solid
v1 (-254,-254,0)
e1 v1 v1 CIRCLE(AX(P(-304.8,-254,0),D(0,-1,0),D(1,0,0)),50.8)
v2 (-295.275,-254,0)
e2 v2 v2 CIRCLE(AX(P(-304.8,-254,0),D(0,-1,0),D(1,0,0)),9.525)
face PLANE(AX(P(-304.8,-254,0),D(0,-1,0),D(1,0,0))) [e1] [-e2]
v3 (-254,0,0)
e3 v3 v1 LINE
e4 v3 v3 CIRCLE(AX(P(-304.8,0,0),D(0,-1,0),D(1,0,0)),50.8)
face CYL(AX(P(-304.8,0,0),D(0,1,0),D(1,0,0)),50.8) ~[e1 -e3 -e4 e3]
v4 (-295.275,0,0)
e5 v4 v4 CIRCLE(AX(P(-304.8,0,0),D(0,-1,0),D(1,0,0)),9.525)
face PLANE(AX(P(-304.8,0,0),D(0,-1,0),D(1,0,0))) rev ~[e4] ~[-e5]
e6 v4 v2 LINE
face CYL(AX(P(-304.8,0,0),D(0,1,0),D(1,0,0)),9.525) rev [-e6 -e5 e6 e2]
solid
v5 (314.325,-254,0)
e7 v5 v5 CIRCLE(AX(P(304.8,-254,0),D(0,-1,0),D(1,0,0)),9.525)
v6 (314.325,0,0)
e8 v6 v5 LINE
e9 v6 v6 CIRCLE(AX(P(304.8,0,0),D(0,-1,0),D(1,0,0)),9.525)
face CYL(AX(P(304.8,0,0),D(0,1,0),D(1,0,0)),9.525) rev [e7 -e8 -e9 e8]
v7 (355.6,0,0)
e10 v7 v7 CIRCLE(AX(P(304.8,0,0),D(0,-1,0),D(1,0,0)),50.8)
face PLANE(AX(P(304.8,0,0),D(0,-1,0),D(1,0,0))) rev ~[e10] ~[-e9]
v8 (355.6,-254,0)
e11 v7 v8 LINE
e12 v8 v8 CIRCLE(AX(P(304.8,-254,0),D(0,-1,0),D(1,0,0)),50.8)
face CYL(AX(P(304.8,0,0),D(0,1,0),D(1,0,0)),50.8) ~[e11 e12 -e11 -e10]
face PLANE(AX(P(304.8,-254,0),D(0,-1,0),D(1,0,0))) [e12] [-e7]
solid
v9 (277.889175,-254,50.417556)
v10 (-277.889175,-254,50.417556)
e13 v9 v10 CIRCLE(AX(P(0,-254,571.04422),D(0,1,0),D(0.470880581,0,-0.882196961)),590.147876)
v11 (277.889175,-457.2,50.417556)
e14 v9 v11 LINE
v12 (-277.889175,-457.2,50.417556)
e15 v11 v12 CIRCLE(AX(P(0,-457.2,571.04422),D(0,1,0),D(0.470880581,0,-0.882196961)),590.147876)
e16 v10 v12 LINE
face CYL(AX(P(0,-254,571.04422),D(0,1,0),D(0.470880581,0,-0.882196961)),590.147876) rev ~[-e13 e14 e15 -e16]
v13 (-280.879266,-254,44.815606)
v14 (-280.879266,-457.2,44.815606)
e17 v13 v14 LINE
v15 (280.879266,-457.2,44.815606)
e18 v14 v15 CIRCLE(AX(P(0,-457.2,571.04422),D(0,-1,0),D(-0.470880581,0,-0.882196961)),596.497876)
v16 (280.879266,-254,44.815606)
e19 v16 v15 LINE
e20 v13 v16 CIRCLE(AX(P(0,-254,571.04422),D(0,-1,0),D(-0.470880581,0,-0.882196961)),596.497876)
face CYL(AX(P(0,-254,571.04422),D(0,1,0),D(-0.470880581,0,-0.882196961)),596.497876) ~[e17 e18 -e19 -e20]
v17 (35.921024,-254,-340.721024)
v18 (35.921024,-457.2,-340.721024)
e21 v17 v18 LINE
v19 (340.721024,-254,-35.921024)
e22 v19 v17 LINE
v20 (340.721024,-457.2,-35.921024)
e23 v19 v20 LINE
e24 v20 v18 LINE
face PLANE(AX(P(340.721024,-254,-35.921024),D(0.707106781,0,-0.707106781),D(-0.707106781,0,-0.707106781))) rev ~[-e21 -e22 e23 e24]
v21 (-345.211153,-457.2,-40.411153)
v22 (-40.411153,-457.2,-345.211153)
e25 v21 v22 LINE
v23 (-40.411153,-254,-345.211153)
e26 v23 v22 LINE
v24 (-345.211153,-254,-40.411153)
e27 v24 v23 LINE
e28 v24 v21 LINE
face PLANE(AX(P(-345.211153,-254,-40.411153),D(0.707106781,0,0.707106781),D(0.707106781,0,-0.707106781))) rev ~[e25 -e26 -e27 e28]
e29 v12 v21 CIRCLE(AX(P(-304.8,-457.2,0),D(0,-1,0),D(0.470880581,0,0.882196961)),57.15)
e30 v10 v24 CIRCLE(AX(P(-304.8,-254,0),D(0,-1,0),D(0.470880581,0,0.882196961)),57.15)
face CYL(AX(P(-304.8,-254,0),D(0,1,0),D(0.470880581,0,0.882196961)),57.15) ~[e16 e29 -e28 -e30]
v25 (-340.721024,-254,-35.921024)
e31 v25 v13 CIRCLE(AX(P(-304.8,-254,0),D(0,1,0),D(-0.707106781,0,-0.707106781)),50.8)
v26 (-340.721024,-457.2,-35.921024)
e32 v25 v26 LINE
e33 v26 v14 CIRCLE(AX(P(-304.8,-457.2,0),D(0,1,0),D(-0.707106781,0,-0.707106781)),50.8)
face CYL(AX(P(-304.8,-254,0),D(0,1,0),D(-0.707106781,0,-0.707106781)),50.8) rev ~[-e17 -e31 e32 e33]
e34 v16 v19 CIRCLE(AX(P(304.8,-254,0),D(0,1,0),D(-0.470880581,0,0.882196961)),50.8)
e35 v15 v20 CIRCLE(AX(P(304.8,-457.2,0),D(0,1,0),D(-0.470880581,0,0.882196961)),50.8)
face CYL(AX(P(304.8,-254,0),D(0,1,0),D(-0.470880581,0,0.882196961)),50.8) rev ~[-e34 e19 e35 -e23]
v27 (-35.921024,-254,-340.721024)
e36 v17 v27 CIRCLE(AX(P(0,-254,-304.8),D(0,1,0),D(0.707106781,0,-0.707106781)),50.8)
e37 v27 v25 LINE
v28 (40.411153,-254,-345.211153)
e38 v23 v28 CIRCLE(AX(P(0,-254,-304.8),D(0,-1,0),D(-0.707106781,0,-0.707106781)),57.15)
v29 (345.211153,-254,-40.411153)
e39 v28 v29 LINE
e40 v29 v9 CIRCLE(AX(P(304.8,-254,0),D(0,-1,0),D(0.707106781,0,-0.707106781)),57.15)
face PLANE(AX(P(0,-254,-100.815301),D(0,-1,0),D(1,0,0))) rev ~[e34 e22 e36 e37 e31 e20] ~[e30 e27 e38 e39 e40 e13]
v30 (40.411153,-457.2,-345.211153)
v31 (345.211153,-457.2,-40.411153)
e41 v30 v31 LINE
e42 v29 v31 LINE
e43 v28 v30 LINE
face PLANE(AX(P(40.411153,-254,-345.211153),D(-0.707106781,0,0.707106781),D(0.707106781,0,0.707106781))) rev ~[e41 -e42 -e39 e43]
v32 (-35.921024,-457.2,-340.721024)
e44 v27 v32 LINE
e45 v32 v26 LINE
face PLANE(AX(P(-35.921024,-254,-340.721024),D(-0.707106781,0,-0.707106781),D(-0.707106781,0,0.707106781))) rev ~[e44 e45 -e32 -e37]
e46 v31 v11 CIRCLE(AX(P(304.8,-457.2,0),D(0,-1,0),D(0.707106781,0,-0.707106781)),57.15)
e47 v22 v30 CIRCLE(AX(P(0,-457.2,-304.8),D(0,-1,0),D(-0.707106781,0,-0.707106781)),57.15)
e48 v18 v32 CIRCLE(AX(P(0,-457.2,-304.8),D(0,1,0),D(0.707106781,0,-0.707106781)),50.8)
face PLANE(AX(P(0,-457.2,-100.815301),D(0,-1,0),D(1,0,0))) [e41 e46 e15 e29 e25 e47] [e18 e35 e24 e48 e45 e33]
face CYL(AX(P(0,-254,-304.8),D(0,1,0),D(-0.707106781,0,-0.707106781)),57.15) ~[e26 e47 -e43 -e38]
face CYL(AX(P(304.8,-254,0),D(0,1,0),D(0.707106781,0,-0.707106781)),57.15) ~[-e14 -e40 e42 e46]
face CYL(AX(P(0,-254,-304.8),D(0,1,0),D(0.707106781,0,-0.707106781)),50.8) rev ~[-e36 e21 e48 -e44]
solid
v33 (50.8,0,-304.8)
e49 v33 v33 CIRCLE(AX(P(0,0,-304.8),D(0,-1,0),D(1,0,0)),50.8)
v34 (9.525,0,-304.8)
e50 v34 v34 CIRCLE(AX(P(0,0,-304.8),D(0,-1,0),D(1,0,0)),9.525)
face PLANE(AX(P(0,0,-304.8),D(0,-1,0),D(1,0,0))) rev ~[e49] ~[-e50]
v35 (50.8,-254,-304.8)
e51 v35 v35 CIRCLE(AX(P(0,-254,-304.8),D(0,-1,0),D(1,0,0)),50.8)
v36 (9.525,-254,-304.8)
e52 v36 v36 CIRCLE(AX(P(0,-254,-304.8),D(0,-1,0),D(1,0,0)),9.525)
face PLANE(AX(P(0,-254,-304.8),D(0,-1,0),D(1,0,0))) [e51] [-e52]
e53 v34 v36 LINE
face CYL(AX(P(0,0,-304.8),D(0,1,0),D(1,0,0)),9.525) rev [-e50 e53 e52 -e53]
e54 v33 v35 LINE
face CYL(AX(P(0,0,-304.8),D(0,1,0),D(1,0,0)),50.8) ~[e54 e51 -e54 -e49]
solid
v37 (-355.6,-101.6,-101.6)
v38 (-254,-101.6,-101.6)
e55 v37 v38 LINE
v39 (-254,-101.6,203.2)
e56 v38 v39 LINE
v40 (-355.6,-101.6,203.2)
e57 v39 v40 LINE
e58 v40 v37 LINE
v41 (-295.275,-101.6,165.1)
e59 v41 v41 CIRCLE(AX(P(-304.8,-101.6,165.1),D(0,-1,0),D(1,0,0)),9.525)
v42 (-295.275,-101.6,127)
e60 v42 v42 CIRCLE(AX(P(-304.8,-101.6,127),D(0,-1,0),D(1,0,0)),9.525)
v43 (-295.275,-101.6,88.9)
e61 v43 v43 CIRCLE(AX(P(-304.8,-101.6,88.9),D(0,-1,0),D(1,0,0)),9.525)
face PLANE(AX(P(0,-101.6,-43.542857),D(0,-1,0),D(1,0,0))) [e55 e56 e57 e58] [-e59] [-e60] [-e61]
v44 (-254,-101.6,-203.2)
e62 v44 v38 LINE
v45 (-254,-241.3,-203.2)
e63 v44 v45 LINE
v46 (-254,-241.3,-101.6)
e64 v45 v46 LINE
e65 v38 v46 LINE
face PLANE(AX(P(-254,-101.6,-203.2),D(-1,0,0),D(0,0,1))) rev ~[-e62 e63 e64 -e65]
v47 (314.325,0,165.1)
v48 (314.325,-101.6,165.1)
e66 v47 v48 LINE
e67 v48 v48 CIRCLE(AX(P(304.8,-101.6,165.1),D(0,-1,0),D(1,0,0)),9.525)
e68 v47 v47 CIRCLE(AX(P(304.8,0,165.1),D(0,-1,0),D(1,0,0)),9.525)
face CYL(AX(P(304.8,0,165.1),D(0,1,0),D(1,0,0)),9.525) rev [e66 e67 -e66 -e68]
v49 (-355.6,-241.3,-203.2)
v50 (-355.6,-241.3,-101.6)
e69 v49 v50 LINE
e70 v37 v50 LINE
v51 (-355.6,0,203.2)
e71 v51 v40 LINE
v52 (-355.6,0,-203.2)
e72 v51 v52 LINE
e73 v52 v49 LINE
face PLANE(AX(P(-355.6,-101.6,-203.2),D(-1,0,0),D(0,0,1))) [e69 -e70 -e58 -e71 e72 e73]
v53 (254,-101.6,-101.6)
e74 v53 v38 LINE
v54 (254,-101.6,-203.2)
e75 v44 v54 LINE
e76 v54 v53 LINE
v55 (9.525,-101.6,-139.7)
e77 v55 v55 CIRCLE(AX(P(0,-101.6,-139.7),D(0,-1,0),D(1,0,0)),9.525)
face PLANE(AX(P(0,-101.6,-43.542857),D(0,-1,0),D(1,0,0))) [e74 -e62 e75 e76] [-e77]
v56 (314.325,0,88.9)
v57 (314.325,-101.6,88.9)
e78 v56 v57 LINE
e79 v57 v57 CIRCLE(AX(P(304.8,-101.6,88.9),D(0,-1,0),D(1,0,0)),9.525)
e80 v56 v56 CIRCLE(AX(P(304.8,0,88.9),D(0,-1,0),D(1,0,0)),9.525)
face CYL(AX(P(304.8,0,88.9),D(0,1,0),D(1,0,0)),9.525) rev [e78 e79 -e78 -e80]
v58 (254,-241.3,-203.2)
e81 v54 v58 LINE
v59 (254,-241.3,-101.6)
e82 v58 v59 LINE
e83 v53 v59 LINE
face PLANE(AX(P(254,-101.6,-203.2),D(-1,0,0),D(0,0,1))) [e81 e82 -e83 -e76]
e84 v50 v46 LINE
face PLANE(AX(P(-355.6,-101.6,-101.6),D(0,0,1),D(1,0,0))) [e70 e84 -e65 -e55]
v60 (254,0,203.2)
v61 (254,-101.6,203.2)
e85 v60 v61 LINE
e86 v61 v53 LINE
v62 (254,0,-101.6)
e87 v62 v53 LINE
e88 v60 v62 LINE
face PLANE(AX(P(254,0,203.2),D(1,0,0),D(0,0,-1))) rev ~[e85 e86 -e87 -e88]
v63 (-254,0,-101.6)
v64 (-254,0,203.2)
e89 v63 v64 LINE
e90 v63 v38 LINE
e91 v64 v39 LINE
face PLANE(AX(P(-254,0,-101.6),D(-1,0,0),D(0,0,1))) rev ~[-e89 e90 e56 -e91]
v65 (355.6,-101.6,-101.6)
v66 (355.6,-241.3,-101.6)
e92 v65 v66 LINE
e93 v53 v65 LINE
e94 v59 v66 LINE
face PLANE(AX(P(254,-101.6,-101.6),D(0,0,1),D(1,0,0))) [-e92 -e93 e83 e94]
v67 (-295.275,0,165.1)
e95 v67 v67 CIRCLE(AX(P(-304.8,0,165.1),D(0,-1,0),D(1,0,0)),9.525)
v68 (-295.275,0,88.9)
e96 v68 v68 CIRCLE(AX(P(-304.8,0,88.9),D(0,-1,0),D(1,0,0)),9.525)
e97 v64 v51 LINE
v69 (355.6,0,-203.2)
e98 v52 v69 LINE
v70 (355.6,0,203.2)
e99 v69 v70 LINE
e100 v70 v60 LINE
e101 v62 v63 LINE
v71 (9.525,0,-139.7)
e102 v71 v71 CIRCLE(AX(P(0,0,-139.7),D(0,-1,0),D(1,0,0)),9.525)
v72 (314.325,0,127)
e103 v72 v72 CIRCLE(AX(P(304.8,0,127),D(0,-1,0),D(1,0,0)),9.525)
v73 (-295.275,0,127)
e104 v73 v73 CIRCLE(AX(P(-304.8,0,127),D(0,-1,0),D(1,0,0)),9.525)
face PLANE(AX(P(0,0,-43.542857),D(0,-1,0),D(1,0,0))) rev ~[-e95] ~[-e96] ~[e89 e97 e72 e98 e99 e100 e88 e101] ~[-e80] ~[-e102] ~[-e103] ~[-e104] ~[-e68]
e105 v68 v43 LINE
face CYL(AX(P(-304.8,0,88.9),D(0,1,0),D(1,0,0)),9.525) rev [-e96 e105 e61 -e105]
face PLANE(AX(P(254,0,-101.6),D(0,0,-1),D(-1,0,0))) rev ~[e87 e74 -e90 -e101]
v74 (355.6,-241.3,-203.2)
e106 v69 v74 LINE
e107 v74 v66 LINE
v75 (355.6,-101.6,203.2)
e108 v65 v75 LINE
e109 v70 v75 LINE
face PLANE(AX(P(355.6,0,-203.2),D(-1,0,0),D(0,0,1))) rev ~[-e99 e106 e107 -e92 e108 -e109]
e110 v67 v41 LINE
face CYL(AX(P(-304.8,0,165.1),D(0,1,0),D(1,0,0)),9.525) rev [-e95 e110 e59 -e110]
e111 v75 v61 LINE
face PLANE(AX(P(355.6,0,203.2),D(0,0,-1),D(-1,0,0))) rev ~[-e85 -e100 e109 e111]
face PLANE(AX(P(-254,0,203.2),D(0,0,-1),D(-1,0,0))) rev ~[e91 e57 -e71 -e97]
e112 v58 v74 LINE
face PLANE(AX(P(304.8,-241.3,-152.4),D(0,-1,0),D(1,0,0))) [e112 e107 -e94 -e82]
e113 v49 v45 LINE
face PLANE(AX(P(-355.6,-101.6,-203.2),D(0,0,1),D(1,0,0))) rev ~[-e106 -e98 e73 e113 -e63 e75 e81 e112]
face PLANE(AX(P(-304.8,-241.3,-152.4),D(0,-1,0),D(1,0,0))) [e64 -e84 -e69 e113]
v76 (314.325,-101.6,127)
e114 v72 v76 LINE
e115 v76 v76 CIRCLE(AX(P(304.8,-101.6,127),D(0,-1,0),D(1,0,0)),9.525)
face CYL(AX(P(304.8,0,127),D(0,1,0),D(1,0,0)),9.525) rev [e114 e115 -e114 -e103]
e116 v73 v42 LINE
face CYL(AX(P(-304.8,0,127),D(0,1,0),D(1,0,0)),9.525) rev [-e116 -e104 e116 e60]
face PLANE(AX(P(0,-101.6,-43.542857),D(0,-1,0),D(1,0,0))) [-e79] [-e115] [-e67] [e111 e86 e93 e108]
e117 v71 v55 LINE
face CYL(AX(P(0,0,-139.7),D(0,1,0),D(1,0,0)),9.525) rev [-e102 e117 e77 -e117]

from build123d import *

# Parameters (mm, degrees)
F0_R     = 50.8
F0_R_2   = 9.525
F1_DEPTH = 254
F2_R     = 9.525
F3_DEPTH = 101.6
F5_DEPTH = 203.2
F6_W     = 101.6
F6_H     = 101.6
F7_DEPTH = 139.7


# Not quite as in the source:
# - a feature names something its author has since deleted; it is built from what else it names


with BuildPart() as f1:
    # F0 (on Front) → F1 (new body)
    with BuildSketch(Plane.XZ):
        with Locations((-304.8, 0)):
            Circle(F0_R)
        with Locations((-304.8, 0)):
            Circle(F0_R_2, mode=Mode.SUBTRACT)
    extrude(amount=F1_DEPTH)


with BuildPart() as f1b:
    # F0 (on Front) → F1, piece 2 (new body)
    with BuildSketch(Plane.XZ):
        with Locations((304.8, 0)):
            Circle(F0_R)
        with Locations((304.8, 0)):
            Circle(F0_R_2, mode=Mode.SUBTRACT)
    extrude(amount=F1_DEPTH)


with BuildPart() as f1c:
    # F0 (on Front) → F1, piece 3 (new body)
    with BuildSketch(Plane.XZ):
        with Locations((0, -304.8)):
            Circle(F0_R)
        with Locations((0, -304.8)):
            Circle(F0_R_2, mode=Mode.SUBTRACT)
    extrude(amount=F1_DEPTH)


with BuildPart() as f3:
    # F2 (on Front) → F3 (new body)
    with BuildSketch(Plane.XZ):
        Polygon((-254, 203.2), (-287.8666666667, 203.2), (-321.7333333333, 203.2), (-355.6, 203.2), (-355.6, -203.2), (355.6, -203.2), (355.6, 203.2), (254, 203.2), (254, -101.6), (-254, -101.6), align=None)
        with Locations((0, -139.7)):
            Circle(F2_R, mode=Mode.SUBTRACT)
        with Locations((-304.8, 88.9)):
            Circle(F2_R, mode=Mode.SUBTRACT)
        with Locations((-304.8, 127)):
            Circle(F2_R, mode=Mode.SUBTRACT)
        with Locations((-304.8, 165.1)):
            Circle(F2_R, mode=Mode.SUBTRACT)
        with Locations((304.8, 88.9)):
            Circle(F2_R, mode=Mode.SUBTRACT)
        with Locations((304.8, 127)):
            Circle(F2_R, mode=Mode.SUBTRACT)
        with Locations((304.8, 165.1)):
            Circle(F2_R, mode=Mode.SUBTRACT)
    extrude(amount=F3_DEPTH)

    # F6 (on face) → F7 (join)
    with BuildSketch(Plane.XZ.offset(101.6)):
        with Locations((-304.8, -152.4)):
            Rectangle(F6_W, F6_H)
        with Locations((304.8, -152.4)):
            Rectangle(F6_W, F6_H)
    extrude(amount=F7_DEPTH)


with BuildPart() as f5:
    # F4 (on face) → F5 (new body)
    with BuildSketch(Plane.XZ.offset(254)):
        with BuildLine():
            ThreePointArc((277.8891748053, 50.4175563404), (0, -19.1036567568), (-277.8891748053, 50.4175563404))
            ThreePointArc((-277.8891748053, 50.4175563404), (-350.7132693138, 34.030783137), (-345.2111525448, -40.4111525448))
            Line((-345.2111525448, -40.4111525448), (-40.4111525448, -345.2111525448))
            ThreePointArc((-40.4111525448, -345.2111525448), (0, -361.95), (40.4111525448, -345.2111525448))
            Line((40.4111525448, -345.2111525448), (345.2111525448, -40.4111525448))
            ThreePointArc((345.2111525448, -40.4111525448), (350.7132693138, 34.030783137), (277.8891748053, 50.4175563404))
        make_face()
        with BuildLine():
            ThreePointArc((-340.7210244843, -35.9210244843), (-345.6117949456, 30.2495850107), (-280.8792664936, 44.8156056359))
            ThreePointArc((-280.8792664936, 44.8156056359), (0, -25.4536567568), (280.8792664936, 44.8156056359))
            ThreePointArc((280.8792664936, 44.8156056359), (345.6117949456, 30.2495850107), (340.7210244843, -35.9210244843))
            Line((340.7210244843, -35.9210244843), (35.9210244843, -340.7210244843))
            ThreePointArc((35.9210244843, -340.7210244843), (0, -355.6), (-35.9210244843, -340.7210244843))
            Line((-35.9210244843, -340.7210244843), (-340.7210244843, -35.9210244843))
        make_face(mode=Mode.SUBTRACT)
    extrude(amount=F5_DEPTH)


solid = Compound([f1.part, f1b.part, f1c.part, f3.part, f5.part])
